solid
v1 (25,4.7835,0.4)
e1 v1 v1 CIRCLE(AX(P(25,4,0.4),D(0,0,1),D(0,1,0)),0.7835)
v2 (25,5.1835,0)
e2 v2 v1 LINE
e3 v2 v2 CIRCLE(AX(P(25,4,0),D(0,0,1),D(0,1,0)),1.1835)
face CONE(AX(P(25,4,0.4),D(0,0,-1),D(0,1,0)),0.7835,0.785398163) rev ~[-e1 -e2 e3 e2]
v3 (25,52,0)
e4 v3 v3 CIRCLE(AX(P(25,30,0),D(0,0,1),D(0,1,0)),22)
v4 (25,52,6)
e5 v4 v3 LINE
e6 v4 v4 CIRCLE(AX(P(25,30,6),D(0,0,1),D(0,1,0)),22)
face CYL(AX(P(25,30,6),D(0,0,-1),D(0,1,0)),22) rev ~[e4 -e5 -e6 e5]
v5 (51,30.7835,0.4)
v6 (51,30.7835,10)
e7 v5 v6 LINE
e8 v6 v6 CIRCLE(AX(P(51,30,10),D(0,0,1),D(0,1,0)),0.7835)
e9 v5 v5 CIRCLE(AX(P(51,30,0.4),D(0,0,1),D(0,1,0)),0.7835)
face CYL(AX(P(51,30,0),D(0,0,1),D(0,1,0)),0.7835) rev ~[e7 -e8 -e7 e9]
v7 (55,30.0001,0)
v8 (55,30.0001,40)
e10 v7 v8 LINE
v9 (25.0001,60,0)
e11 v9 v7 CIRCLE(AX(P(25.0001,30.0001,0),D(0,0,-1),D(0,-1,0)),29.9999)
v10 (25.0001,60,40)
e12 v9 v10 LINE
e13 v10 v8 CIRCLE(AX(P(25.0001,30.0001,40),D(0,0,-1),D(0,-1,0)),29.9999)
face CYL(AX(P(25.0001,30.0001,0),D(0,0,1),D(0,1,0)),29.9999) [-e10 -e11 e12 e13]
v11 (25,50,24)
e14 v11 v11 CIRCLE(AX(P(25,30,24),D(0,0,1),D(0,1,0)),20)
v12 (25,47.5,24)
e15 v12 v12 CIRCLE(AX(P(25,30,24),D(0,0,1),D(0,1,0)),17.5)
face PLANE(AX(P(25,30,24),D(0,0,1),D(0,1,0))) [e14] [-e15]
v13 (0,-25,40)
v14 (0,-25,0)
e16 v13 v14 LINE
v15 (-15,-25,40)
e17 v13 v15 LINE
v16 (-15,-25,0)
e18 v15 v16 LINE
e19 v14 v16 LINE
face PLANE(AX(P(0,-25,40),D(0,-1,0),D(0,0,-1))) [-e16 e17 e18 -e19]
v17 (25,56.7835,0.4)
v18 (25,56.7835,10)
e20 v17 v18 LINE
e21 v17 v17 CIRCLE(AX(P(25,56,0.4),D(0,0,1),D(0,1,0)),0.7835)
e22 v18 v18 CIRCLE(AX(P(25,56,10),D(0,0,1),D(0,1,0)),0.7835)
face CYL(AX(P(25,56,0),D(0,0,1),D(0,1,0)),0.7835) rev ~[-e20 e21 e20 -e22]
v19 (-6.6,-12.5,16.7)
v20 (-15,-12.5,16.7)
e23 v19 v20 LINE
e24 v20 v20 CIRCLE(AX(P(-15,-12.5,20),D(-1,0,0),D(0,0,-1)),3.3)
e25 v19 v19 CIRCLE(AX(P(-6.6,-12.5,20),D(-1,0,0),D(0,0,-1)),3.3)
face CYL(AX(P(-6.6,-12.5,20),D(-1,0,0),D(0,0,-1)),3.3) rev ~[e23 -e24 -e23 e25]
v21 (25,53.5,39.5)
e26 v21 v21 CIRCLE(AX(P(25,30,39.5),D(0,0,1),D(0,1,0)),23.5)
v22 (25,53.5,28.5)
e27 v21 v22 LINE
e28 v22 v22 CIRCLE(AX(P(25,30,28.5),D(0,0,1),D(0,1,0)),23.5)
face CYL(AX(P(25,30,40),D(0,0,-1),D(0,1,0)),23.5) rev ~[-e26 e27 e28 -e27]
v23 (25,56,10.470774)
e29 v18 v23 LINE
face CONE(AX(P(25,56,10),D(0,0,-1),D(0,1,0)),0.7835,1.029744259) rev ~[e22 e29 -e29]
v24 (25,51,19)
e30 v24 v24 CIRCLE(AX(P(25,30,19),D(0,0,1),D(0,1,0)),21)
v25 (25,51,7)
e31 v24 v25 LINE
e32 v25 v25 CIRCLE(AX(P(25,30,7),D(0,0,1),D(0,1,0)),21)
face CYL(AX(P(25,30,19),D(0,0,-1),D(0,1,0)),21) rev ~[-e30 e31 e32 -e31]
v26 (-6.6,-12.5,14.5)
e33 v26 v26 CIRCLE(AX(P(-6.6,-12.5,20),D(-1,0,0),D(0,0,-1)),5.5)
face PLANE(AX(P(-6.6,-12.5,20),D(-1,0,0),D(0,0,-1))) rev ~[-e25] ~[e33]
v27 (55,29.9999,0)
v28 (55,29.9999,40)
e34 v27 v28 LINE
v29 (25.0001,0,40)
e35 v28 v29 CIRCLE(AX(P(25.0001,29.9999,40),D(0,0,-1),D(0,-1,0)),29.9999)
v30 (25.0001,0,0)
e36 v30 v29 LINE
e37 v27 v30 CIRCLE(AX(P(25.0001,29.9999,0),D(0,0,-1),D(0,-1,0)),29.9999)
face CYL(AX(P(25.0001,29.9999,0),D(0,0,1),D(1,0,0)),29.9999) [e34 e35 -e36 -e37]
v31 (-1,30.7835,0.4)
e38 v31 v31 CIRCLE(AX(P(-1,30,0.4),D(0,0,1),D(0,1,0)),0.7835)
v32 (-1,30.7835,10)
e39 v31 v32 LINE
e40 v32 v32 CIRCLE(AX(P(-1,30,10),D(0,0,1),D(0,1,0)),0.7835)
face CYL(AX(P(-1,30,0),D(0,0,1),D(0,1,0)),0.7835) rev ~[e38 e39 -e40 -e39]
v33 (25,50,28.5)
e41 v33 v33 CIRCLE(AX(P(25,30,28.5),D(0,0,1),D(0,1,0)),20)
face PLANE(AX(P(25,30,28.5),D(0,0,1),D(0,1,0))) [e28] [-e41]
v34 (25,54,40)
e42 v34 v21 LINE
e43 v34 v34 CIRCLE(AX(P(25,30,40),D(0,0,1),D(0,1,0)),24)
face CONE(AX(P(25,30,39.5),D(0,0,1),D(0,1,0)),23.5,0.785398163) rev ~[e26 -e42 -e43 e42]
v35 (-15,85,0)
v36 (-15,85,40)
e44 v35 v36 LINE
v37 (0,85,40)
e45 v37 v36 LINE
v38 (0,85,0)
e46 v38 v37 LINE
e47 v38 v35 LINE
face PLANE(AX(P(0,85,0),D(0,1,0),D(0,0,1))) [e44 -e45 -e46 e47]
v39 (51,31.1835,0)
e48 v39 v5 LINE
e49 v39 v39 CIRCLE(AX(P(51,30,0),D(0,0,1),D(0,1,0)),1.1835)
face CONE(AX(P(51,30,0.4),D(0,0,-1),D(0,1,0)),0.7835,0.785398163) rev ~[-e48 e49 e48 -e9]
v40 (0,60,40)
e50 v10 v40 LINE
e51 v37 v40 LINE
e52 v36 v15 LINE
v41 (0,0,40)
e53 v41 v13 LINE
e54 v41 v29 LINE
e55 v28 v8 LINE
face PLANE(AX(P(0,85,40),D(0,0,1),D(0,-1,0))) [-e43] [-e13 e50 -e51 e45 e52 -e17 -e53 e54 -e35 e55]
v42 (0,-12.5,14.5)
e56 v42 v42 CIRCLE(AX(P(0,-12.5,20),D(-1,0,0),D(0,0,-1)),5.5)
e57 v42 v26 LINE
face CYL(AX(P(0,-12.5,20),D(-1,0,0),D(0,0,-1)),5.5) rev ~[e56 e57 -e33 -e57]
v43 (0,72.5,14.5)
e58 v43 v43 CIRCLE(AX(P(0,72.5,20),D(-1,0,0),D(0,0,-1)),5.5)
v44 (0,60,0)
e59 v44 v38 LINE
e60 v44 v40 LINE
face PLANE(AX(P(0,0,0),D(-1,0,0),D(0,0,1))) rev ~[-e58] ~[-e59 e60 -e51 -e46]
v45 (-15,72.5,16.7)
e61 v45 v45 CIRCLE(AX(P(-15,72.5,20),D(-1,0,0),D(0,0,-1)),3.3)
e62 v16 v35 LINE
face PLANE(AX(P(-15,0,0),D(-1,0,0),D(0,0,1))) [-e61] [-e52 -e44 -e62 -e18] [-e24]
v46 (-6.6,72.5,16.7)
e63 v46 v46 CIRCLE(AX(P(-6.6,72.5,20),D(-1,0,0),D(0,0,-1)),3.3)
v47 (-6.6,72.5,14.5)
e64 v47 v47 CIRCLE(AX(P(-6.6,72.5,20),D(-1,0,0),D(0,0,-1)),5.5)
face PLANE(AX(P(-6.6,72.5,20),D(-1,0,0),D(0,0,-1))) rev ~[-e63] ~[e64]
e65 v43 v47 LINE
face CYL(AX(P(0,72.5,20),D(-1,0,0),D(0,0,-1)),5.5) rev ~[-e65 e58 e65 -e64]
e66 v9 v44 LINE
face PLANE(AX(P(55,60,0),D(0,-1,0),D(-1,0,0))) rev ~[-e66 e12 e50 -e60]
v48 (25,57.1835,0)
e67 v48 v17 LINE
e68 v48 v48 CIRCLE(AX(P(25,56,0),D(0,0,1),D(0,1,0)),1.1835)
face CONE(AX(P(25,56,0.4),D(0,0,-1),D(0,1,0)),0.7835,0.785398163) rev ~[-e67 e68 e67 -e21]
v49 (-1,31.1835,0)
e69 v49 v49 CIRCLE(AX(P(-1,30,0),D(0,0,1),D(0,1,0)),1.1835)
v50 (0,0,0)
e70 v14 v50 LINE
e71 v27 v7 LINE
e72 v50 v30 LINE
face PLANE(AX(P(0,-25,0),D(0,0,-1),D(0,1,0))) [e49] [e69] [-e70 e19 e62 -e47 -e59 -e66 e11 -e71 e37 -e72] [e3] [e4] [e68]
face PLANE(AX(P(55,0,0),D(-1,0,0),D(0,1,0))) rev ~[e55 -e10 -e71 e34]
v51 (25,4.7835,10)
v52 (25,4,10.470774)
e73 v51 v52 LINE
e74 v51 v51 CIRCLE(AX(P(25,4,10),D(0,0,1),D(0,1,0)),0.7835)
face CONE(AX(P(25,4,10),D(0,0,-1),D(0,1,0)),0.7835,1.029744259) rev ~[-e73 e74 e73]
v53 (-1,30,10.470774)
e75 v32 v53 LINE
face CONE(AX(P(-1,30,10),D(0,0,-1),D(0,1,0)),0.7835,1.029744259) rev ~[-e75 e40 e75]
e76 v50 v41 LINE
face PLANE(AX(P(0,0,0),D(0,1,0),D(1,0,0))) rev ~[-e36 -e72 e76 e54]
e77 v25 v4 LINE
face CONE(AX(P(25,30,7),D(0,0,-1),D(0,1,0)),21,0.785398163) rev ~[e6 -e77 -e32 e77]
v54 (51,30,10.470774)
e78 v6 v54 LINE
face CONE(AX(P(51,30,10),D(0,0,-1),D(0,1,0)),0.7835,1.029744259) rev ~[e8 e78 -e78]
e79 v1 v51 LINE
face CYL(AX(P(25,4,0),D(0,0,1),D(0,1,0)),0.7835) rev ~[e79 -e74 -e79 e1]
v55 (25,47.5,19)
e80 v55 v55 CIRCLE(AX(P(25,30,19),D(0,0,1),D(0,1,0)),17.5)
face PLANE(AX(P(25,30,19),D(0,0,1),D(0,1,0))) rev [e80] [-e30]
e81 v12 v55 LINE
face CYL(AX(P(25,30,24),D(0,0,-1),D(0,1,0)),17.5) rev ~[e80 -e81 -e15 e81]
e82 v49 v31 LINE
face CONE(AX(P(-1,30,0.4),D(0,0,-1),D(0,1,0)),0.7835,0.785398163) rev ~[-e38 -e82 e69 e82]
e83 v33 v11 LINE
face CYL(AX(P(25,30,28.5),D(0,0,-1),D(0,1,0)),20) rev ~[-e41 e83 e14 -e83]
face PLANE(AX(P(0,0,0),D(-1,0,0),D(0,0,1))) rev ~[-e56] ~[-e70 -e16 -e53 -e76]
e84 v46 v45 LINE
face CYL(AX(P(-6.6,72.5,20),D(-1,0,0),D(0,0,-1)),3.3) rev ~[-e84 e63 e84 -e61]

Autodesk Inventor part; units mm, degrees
ref_plane "YZ Plane" through (0, 0, 0) normal (1, 0, 0) x (0, 1, 0)
ref_plane "XZ Plane" through (0, 0, 0) normal (0, 1, 0) x (-1, 0, 0)
sketch "Skizze1" plane through (0, 0, 0) normal (0, 0, 1) x (1, 0, 0)
  line L0 (0, 0) -> (55, 0)
  line L1 (55, 0) -> (55, 60)
  line L2 (55, 60) -> (0, 60)
  line L3 (0, 60) -> (0, 0)
  dimension "d0" = 60
  dimension "d1" = 55
extrude "Grundkörper" add sketch "Skizze1" along normal blind 40
fillet "Konturverrundung" radius 30 2 edges at (55, 60, 20) (55, 0, 20)
sketch "Skizze2" plane through (0, 0, 40) normal (0, 0, 1) x (1, 0, 0)
  point P0 (0, 0)
  point P1 (25, 30)
  point P2 (25, 30)
hole "Durchgangsbohrung 60H7" at (25, 30, 40) direction (0, 0, -1) diameter 55 end through all
sketch "Skizze3" plane through (0, 0, 0) normal (-1, 0, 0) x (0, 0, 1)
  line L0 (0, 0) -> (40, 0) construction
  line L1 (40, 60) -> (40, 0) construction
  line L2 (0, 0) -> (40, 60) construction
  line L3 (0, 60) -> (40, 60) construction
  line L4 (0, 60) -> (40, 0) construction
  line L5 (0, 85) -> (40, 85)
  line L6 (40, 85) -> (40, -25)
  line L7 (40, -25) -> (0, -25)
  line L8 (0, -25) -> (0, 85)
  line L9 (0, 85) -> (40, -25) construction
  line L10 (40, 85) -> (0, -25) construction
  point P0 (20, 30)
  dimension "d16" = 110
extrude "Aufnahmeplatte" add sketch "Skizze3" along normal blind 15
sketch "Skizze4" plane through (0, 0, 0) normal (1, 0, 0) x (0, 0, -1)
  line L0 (-40, 85) -> (0, 85) projected
  line L1 (-20, 85) -> (-20, -25)
  line L2 (-40, -25) -> (0, -25) projected
  line L3 (0, 60) -> (-40, 60) projected
  line L4 (8, 30) -> (-48, 30) projected
  point P0 (0, 0)
  point P1 (-20, 72.5)
  point P2 (-20, -12.5)
  dimension "d26" = 25
  dimension "d27" = 12.5
hole "Senkung_Zylinderkopfschraube M6" at (0, 72.5, 20) at (0, -12.5, 20) direction (-1, 0, 0) diameter 6.6 end through all counterbore diameter 11 counterbore depth 6.6 clearance for "Inbusschraube DIN EN ISO 4762" size "M6" standard "DIN"
ref_plane "Konstruktionshilfsebene" through (25, 30, 0) normal (-1, 0, 0) x (0, -1, 0)
ref_plane "Arbeitsebene3" through (55, 30, 0) normal (-1, 0, 0) x (0, -1, 0)
sketch "Skizze6" plane through (25, 30, 0) normal (-1, 0, 0) x (0, -1, 0)
  line L0 (-27.5, 0) -> (-27.5, 40) construction
  line L1 (-6.1835, 0) -> (-3.8165, 0) construction
  line L2 (0, 0) -> (0, 40) construction
  line L3 (-27.5, 40) -> (27.5, 40) construction
  line L4 (-27.5, 40) -> (-23.5, 40)
  line L5 (-23.5, 40) -> (-23.5, 28.5)
  line L6 (-23.5, 28.5) -> (-20, 28.5)
  line L7 (-20, 28.5) -> (-20, 24)
  line L8 (-17.5, 24) -> (-17.5, 19)
  line L9 (-17.5, 19) -> (-21, 19)
  line L10 (-21, 19) -> (-21, 7)
  line L11 (-21, 7) -> (-21, 7)
  line L12 (-22, 6) -> (-22, 0)
  line L13 (27.5, 0) -> (-27.5, 0) construction
  line L14 (-22, 0) -> (-27.5, 0)
  line L15 (-21, 7) -> (-22, 6)
  line L16 (-27.5, 40) -> (-27.5, 0)
  line L17 (-20, 24) -> (-17.5, 24)
  point P0 (30, 0)
  point P1 (-22, 7)
  dimension "d46" = 47
  dimension "d47" = 11.5
  dimension "d48" = 40
  dimension "d49" = 35
  dimension "d52" = 33
  dimension "d53" = 21
  dimension "d54" = 42
  dimension "d55" = 44
  dimension "d57" = 1
  dimension "d58" = 1
  dimension "d79" = 9.5
  dimension "d80" = 16
revolve "Lagersitz" add sketch "Skizze6" angle 360 about axis through (25, 30, 0) along (0, 0, 1)
sketch "Skizze8" plane through (0, 0, 0) normal (0, 0, -1) x (-1, 0, 0)
  circle A0 centre (-25, 30) radius 17.5 construction
  line L0 (-25, 60) -> (0, 60) construction
  line L1 (-25, 30) -> (-25, 60) construction
  line L2 (-25, 30) -> (-55, 30) construction
  arc A1 (-25, 60) -> (-25, 0) centre (-25, 30) ccw construction
  circle A2 centre (-25, 30) radius 26 construction
  point P0 (0, 0)
  point P1 (-25, 56)
  point P2 (-51, 30)
  point P3 (-25, 4)
  point P4 (1, 30)
  dimension "d68" = 52
  dimension "d67" = 30
  dimension "d71" = 360
hole "Gewinde_Keine_ISO Metrisches Profil_2_Winkel(5)" at (25, 56, 0) at (51, 30, 0) at (25, 4, 0) at (-1, 30, 0) direction (0, 0, 1) diameter 1.567 depth 10 tip angle 118 thread size "M2x0.4" class "6H" standard "ISO Metric profile"
chamfer "Gewindesenkung 0.4mm" distance 0.4 angle 45 4 edges at (25, 55.2165, 0) (51, 29.2165, 0) (-1, 29.2165, 0) (25, 3.2165, 0)
chamfer "Fase4" distance 0.5 angle 45 1 edges at (25, 6.5, 40)
equation "\"d27\" = 0.5 * d26"
equation "\"d58\" = d57"
properties part number "shoulder_joint_fit_v2" material "Stahl, hochfest, niedrig legiert"
